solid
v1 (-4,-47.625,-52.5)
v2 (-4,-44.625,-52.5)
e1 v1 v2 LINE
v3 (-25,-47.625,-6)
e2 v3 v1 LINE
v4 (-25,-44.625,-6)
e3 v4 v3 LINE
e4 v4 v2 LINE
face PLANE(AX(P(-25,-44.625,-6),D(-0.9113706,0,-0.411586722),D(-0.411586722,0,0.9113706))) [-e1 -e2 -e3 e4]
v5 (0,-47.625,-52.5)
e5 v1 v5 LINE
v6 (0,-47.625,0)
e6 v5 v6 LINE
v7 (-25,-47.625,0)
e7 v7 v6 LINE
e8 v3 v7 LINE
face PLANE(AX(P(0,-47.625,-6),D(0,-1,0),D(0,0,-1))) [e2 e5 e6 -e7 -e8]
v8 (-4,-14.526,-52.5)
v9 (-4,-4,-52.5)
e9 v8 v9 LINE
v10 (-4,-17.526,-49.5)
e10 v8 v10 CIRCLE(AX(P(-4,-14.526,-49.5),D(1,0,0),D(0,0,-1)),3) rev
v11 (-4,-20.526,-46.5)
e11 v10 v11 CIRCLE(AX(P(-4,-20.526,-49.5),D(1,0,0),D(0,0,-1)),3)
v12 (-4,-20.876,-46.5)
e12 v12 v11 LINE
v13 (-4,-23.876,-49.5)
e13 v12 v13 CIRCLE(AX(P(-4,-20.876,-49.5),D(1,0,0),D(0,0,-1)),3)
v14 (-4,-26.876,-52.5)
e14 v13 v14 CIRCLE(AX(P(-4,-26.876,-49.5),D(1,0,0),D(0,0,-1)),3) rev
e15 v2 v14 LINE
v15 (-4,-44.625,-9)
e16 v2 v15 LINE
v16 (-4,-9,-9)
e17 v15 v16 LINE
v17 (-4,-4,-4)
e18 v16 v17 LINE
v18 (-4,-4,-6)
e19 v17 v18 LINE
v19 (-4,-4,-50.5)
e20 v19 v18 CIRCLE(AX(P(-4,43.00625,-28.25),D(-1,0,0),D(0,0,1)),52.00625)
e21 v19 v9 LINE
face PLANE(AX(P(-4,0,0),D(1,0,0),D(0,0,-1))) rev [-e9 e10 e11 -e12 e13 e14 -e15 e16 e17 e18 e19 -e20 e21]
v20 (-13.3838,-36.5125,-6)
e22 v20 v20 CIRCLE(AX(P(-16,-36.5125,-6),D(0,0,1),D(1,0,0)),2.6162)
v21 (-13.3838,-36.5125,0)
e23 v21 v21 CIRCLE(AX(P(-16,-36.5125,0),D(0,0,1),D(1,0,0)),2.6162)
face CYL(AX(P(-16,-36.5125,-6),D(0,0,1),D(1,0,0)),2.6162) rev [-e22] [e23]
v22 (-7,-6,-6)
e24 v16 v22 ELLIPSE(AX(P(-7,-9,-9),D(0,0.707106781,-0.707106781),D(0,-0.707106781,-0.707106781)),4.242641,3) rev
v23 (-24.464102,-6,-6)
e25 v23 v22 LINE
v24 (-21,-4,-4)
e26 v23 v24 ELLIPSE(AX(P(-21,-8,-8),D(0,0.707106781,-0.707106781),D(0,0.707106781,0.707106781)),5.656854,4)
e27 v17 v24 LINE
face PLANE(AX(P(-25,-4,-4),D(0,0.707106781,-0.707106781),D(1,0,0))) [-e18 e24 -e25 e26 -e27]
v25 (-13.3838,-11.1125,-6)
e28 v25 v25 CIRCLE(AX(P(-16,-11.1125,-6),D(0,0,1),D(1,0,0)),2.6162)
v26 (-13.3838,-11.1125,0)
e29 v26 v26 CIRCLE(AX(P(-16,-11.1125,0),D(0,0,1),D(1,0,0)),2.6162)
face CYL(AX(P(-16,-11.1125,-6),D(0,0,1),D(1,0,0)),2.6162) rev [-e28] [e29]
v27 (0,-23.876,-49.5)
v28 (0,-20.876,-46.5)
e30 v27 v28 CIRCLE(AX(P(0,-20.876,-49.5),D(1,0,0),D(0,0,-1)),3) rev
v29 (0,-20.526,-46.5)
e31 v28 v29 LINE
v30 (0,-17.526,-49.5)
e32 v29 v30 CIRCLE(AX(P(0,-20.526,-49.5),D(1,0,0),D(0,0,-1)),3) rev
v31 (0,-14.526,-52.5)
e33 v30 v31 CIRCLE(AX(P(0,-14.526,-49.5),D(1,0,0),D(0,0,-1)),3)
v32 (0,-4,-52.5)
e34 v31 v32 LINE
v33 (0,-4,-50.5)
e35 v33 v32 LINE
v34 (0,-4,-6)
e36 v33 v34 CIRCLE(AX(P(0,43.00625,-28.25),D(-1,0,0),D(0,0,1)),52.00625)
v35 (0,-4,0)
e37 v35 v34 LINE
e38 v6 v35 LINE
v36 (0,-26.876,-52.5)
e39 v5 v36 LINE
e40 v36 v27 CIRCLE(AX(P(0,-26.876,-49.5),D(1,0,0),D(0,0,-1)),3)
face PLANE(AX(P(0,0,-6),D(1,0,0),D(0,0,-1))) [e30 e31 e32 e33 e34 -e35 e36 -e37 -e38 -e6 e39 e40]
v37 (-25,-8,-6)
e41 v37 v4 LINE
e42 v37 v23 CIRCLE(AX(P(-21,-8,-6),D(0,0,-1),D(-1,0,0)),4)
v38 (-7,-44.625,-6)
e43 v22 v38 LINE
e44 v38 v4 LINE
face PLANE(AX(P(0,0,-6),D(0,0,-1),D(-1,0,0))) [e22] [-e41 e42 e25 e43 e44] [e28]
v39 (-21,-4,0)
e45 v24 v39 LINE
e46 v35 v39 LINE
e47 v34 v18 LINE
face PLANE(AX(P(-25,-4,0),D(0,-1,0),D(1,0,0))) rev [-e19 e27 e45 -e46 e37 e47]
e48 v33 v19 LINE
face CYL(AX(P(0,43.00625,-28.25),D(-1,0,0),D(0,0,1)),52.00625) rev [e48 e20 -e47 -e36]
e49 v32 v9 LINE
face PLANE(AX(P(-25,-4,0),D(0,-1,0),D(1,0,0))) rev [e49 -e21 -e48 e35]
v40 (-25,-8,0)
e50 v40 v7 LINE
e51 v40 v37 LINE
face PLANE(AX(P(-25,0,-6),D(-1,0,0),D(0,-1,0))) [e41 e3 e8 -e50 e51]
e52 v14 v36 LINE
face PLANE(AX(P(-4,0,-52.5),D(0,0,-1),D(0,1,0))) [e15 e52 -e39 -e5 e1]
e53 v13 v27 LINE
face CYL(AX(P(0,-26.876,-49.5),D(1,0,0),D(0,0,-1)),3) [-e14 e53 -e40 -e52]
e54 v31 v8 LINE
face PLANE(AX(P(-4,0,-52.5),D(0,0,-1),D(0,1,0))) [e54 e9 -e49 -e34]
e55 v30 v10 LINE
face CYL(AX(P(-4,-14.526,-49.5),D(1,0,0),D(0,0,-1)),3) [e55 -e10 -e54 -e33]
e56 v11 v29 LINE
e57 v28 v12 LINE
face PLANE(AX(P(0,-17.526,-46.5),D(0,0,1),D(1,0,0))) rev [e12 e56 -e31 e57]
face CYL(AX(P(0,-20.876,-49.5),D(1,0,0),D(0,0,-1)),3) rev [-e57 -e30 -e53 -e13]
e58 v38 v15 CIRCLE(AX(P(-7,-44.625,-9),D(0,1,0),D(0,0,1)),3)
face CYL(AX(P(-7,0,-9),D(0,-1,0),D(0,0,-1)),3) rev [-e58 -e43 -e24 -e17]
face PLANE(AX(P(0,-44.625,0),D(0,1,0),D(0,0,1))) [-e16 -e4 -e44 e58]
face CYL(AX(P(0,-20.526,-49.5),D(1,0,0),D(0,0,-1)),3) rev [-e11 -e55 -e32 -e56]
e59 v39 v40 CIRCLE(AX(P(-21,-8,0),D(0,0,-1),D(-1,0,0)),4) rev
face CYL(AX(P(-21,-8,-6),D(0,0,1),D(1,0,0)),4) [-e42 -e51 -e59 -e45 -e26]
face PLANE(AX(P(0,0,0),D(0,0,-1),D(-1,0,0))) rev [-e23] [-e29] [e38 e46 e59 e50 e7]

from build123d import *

# Parameters (mm, degrees)
SKETCH1_W               = 25
SKETCH1_H               = 47.625
SKETCH1_R               = 2.6162
BOSS_EXTRUDE1_DEPTH     = 6
SKETCH3_W               = 52.5
SKETCH3_H               = 47.625
BOSS_EXTRUDE2_DEPTH     = 4
BOSS_EXTRUDE3_DEPTH     = 3
CUT_EXTRUDE1_DEPTH      = 72.101270207
CUT_EXTRUDE1_DEPTH_BACK = 72.101270207
SKETCH5_W               = 25
SKETCH5_H               = 4
CHAMFER1_SIZE           = 2
SKETCH6_W               = 6
SKETCH6_H               = 6.35
CUT_EXTRUDE2_DEPTH      = 74.928280279
CUT_EXTRUDE3_DEPTH      = 74.928280279
FILLET2_R               = 3
FILLET1_R               = 3
FILLET3_R               = 4


with BuildPart() as part:
    # Sketch1 → Boss-Extrude1 (new body)
    with BuildSketch(Plane.XY):
        with Locations((-12.5, -23.8125)):
            Rectangle(SKETCH1_W, SKETCH1_H)
        with Locations((-16, -11.1125)):
            Circle(SKETCH1_R, mode=Mode.SUBTRACT)
        with Locations((-16, -36.5125)):
            Circle(SKETCH1_R, mode=Mode.SUBTRACT)
    extrude(amount=-BOSS_EXTRUDE1_DEPTH)

    # Sketch3 → Boss-Extrude2 (add)
    with BuildSketch(Plane(origin=(0, 0, 0), x_dir=(0, 0, -1), z_dir=(1, 0, 0))):
        with Locations((26.25, -23.8125)):
            Rectangle(SKETCH3_W, SKETCH3_H)
    extrude(amount=-BOSS_EXTRUDE2_DEPTH)

    # Sketch4 → Boss-Extrude3 (add)
    with BuildSketch(Plane.XZ.offset(47.625)):
        Polygon((-25, -6), (-4, -52.5), (-4, -6), align=None)
    extrude(amount=-BOSS_EXTRUDE3_DEPTH)

    # Sketch5 → Cut-Extrude1 (cut, two sides: drawn at the far end of the back side and taken through both)
    with BuildSketch(Plane(origin=(0, 0, -6), x_dir=(-1, 0, 0), z_dir=(0, 0, -1)).offset(-CUT_EXTRUDE1_DEPTH_BACK)):
        with Locations((12.5, -2)):
            Rectangle(SKETCH5_W, SKETCH5_H)
    extrude(amount=CUT_EXTRUDE1_DEPTH + CUT_EXTRUDE1_DEPTH_BACK, mode=Mode.SUBTRACT)

    # Chamfer1
    chamfer1_edges = [part.edges().sort_by_distance(p)[0] for p in [
        (-14.5, -4, -6),
    ]]
    chamfer(chamfer1_edges, length=CHAMFER1_SIZE)

    # Sketch6 → Cut-Extrude2 (cut, through all)
    with BuildSketch(Plane.ZY.offset(4)):
        with Locations((-49.5, -20.701)):
            Rectangle(SKETCH6_W, SKETCH6_H)
    extrude(amount=-CUT_EXTRUDE2_DEPTH, mode=Mode.SUBTRACT)

    # Sketch7 → Cut-Extrude3 (cut, through all)
    with BuildSketch(Plane.ZY.offset(4)):
        with BuildLine():
            Line((-50.5, -4), (-6, -4))
            ThreePointArc((-6, -4), (-28.25, -9), (-50.5, -4))
        make_face()
    extrude(amount=-CUT_EXTRUDE3_DEPTH, mode=Mode.SUBTRACT)

    # Fillet2
    fillet2_edges = [part.edges().sort_by_distance(p)[0] for p in [
        (-2, -17.526, -46.5),
        (-2, -23.876, -46.5),
    ]]
    fillet(fillet2_edges, radius=FILLET2_R)
    fillet2_2_edges = [part.edges().sort_by_distance(p)[0] for p in [
        (-2, -17.526, -52.5),
        (-2, -23.876, -52.5),
    ]]
    fillet(fillet2_2_edges, radius=FILLET2_R - 0.0001)  # a hair under: the kernel refuses the full size

    # Fillet1
    fillet1_edges = [part.edges().sort_by_distance(p)[0] for p in [
        (-4, -25.3125, -6),
    ]]
    fillet(fillet1_edges, radius=FILLET1_R)

    # Fillet3
    fillet3_edges = [part.edges().sort_by_distance(p)[0] for p in [
        (-25, -4, -2),
    ]]
    fillet(fillet3_edges, radius=FILLET3_R)


solid = part.part
